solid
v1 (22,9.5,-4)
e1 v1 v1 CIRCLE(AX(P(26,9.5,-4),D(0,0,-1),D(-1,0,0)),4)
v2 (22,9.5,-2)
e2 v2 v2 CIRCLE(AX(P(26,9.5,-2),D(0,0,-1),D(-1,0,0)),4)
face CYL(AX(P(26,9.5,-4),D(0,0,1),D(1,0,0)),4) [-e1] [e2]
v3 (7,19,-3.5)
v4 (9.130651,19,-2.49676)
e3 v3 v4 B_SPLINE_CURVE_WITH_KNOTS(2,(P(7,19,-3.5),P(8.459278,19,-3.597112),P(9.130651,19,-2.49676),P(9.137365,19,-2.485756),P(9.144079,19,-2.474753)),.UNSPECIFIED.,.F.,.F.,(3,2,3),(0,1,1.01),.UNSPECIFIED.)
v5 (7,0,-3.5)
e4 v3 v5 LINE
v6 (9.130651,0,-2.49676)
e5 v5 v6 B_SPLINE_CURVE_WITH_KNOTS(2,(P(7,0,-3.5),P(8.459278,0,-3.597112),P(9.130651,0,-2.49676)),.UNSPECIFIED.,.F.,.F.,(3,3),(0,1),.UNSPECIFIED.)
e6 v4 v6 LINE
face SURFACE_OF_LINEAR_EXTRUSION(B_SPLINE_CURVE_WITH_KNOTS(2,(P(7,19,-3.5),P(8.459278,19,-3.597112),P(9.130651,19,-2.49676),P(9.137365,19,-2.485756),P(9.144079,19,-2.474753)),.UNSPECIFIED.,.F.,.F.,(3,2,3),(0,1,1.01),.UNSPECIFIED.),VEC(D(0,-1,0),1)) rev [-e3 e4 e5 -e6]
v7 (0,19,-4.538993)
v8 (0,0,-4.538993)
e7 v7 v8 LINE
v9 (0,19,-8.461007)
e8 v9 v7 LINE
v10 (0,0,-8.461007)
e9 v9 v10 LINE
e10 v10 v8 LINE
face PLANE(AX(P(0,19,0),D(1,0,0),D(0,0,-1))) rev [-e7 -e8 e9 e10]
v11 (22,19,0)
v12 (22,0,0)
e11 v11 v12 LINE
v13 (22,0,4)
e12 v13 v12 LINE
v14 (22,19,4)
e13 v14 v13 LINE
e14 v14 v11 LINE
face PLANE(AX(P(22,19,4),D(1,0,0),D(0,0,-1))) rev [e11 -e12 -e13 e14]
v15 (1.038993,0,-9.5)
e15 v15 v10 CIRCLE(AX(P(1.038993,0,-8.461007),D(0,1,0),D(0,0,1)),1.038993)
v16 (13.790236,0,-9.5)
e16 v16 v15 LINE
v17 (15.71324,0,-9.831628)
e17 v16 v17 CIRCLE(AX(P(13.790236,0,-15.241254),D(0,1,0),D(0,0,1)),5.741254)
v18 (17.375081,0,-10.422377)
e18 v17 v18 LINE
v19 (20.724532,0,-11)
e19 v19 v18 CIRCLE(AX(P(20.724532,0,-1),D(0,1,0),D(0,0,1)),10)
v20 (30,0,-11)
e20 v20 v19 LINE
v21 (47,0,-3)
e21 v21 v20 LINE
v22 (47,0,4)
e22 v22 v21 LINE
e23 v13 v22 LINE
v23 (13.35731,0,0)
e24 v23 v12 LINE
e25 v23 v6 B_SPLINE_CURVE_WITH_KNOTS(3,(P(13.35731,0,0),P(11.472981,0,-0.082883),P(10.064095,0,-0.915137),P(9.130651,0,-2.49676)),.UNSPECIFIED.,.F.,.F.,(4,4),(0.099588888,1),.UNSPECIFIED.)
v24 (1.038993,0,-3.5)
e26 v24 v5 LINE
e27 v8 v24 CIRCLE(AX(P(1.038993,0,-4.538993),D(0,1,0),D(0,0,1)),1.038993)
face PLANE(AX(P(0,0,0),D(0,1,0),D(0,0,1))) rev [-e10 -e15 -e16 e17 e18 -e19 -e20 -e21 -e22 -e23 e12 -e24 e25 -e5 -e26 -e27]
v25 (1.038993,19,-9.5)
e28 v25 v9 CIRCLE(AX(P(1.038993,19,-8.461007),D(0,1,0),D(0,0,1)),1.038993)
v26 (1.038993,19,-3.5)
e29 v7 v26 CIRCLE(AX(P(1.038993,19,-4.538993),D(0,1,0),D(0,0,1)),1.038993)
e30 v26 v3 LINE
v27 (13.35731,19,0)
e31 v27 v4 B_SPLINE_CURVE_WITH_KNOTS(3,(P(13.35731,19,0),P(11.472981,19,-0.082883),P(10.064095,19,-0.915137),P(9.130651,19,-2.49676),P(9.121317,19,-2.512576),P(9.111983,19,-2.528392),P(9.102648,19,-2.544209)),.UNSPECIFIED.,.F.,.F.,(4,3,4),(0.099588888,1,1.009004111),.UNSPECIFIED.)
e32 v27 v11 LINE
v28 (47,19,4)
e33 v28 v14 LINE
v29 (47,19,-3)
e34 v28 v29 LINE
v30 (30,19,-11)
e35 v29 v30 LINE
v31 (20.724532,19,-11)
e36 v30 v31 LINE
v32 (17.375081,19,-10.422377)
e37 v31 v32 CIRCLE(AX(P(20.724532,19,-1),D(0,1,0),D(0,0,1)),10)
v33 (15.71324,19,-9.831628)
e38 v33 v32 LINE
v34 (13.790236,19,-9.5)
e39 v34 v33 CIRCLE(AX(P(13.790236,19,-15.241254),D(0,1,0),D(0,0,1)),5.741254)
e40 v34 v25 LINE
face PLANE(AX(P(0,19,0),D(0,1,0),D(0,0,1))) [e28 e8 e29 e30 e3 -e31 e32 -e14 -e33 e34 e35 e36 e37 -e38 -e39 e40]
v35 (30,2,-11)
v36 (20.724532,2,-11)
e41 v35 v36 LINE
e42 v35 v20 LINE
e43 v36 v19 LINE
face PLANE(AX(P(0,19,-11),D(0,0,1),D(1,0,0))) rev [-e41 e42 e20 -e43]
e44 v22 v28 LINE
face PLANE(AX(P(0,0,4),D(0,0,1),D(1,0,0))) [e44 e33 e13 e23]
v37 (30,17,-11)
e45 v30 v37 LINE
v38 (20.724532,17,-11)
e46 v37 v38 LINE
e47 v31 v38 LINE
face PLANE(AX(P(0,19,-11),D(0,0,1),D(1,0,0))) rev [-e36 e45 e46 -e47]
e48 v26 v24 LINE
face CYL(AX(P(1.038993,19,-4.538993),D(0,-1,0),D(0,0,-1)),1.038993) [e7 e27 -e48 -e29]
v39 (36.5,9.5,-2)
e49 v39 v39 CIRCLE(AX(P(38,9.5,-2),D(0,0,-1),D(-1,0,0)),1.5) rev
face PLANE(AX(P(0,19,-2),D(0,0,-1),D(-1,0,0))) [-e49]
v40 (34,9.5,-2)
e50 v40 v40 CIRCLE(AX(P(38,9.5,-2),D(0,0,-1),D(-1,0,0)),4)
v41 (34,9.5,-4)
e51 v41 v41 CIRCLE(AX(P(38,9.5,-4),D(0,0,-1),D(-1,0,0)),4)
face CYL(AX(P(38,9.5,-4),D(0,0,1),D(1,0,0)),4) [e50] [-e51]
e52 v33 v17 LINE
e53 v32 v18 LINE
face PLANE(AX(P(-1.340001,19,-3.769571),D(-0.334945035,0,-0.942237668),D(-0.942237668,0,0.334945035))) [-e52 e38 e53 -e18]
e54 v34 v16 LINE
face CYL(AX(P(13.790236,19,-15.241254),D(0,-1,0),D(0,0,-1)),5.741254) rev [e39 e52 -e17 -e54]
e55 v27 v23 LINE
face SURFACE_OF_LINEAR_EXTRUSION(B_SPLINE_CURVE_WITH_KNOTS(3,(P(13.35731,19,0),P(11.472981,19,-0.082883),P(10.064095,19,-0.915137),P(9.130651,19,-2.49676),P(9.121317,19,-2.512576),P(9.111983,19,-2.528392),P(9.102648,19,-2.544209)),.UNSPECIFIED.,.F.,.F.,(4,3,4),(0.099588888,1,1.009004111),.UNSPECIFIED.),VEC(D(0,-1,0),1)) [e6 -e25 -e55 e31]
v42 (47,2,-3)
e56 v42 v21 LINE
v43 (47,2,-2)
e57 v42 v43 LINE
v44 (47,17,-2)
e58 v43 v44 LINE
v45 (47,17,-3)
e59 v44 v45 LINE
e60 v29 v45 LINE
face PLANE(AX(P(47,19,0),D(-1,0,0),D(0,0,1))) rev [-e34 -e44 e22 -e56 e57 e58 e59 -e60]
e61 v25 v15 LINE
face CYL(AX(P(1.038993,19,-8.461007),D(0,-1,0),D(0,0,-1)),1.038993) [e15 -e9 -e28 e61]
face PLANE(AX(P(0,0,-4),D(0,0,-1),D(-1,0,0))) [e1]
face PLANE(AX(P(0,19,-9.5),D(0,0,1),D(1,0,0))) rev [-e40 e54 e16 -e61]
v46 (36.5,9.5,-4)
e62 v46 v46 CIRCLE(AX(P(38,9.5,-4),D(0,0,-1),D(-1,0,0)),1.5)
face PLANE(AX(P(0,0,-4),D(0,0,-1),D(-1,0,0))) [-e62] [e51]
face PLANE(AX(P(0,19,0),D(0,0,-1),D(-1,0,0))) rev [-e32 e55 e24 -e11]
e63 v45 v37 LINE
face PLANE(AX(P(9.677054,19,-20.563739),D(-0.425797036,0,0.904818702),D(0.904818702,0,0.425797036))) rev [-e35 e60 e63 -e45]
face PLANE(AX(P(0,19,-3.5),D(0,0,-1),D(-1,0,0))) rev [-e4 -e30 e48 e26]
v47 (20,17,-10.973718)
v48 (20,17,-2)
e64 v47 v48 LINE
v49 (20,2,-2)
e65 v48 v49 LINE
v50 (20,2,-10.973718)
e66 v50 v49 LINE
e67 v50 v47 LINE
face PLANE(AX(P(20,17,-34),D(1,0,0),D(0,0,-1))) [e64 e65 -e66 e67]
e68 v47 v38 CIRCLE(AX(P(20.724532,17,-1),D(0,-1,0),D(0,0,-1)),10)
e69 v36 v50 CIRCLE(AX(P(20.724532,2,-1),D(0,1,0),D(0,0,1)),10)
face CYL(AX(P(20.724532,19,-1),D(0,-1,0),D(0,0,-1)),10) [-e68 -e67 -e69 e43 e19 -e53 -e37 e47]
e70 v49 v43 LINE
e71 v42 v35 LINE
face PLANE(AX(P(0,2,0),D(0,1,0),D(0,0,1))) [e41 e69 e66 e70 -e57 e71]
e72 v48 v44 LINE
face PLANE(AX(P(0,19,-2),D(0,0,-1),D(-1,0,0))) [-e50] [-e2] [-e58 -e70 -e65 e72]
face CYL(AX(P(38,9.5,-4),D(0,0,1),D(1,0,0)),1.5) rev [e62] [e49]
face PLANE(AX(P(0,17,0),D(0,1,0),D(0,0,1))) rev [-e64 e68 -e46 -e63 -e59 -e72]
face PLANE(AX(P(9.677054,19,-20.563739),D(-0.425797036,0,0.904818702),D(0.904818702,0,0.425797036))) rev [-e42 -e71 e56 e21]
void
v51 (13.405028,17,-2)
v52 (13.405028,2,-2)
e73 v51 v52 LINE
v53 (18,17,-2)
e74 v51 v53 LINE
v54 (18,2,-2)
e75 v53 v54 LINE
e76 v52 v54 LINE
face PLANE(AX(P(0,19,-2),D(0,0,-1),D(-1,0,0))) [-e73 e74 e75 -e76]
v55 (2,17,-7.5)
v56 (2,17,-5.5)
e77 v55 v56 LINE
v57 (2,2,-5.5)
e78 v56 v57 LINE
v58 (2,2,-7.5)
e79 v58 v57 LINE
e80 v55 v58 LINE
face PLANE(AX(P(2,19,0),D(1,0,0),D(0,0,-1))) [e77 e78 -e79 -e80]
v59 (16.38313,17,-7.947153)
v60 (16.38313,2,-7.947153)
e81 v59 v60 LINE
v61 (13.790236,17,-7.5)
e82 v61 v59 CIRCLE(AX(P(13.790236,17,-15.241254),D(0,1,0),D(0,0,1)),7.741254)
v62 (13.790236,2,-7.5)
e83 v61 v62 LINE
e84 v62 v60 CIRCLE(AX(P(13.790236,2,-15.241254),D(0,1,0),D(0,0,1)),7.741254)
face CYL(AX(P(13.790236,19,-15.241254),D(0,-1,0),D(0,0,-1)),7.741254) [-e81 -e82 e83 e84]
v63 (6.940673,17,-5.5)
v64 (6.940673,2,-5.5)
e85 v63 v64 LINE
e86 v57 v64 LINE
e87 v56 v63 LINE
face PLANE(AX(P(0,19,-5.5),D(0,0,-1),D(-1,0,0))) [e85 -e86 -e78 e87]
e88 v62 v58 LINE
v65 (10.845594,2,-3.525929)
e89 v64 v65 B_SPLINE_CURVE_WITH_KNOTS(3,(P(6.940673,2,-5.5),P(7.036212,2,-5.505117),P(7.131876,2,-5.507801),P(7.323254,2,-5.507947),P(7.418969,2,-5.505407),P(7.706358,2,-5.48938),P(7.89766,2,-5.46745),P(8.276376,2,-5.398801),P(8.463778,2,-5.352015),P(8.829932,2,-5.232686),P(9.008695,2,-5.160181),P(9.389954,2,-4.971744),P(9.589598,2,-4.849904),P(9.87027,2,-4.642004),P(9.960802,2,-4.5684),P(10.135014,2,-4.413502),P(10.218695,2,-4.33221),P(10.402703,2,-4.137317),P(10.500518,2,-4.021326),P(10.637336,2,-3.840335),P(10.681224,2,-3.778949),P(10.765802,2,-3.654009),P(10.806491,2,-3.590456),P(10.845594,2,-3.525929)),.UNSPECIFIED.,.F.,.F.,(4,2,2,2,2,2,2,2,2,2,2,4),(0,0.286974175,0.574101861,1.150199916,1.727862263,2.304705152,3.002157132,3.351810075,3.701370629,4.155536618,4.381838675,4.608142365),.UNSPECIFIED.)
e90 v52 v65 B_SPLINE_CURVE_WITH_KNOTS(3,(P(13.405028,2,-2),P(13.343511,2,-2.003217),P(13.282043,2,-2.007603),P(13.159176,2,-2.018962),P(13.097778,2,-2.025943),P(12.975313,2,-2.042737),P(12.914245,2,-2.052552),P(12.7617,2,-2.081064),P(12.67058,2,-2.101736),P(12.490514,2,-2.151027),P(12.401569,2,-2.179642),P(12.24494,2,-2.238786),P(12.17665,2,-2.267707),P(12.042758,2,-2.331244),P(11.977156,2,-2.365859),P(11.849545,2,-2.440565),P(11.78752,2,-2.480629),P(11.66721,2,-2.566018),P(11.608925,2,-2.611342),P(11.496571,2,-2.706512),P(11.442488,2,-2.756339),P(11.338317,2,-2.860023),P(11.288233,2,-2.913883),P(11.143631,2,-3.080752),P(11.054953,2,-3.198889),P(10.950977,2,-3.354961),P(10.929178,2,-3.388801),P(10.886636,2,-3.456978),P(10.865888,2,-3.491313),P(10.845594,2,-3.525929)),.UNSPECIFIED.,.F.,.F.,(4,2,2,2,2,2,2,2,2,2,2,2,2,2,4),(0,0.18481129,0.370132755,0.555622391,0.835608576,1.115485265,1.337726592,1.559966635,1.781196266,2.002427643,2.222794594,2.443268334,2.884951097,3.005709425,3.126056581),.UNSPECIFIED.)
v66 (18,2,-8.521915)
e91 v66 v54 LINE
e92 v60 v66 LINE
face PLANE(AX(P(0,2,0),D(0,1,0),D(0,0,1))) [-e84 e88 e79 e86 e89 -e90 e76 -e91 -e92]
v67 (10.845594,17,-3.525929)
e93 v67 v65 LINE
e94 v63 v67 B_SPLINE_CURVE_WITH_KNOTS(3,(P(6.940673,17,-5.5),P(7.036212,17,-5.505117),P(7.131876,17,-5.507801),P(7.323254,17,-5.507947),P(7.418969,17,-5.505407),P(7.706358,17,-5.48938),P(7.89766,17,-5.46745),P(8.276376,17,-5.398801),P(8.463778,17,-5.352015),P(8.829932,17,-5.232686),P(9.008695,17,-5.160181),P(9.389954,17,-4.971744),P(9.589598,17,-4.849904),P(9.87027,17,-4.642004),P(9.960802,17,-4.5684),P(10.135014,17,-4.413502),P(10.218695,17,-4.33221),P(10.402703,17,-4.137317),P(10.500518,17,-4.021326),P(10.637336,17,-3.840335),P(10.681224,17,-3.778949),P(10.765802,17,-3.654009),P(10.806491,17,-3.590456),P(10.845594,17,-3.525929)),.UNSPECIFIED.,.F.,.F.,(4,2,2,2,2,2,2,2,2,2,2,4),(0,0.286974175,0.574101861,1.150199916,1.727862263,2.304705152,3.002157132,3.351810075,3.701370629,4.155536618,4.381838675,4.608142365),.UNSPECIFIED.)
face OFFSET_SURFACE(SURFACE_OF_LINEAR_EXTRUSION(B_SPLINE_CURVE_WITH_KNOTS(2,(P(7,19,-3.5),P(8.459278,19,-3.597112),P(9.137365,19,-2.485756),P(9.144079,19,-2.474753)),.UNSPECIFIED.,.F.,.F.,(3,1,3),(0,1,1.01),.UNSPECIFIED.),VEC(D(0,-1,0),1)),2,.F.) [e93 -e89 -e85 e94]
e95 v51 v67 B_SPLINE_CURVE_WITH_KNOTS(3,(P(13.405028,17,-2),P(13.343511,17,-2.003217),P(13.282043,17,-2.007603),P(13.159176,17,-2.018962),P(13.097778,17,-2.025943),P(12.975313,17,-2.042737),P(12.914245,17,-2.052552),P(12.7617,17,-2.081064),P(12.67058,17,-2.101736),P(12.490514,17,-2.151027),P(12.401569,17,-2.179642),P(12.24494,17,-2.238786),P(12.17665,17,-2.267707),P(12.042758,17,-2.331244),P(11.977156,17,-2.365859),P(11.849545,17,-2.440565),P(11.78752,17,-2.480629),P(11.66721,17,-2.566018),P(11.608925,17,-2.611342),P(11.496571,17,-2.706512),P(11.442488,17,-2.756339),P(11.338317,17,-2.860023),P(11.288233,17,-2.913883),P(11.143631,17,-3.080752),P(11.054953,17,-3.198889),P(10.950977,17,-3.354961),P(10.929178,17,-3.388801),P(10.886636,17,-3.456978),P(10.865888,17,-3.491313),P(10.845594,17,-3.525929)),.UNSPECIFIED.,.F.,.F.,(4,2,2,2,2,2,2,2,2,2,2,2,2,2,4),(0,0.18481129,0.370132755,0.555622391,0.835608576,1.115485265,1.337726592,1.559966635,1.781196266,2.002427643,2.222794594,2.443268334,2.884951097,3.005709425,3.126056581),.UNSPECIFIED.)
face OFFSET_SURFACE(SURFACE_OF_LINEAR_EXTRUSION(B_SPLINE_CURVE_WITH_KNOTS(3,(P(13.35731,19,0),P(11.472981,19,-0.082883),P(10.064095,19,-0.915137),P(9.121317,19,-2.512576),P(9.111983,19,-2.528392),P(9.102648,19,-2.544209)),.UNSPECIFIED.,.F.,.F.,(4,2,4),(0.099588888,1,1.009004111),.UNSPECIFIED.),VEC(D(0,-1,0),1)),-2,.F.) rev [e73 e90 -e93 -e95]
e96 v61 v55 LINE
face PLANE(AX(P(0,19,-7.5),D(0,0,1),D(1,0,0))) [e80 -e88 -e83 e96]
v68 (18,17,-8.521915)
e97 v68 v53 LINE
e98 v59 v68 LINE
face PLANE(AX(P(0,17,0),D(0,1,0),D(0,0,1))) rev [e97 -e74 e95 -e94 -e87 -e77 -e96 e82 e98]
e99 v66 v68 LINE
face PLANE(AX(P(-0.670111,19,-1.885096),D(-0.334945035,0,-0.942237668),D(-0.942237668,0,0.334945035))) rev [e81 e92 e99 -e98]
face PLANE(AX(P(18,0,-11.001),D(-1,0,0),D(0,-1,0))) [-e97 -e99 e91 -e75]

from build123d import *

# Parameters (mm, degrees)
BOSS_EXTRUDE1_DEPTH = 19
SHELL1_START        = 2
SHELL1_DEPTH        = 15
SKETCH3_W           = 1.941176471
SKETCH3_H           = 15
CUT_EXTRUDE1_DEPTH  = 19
SKETCH4_W           = 27
SKETCH4_H           = 15
CUT_EXTRUDE2_DEPTH  = 32
BOSS_EXTRUDE2_REACH = 53.488
SKETCH5_W           = 2
SKETCH5_H           = 15
BOSS_EXTRUDE3_DEPTH = 2
SKETCH9_W           = 25
SKETCH9_H           = 19
BOSS_EXTRUDE4_DEPTH = 4


# Read off the part's stored shape, not the designer's step: Shell1
with BuildPart() as part:
    # Sketch1 → Boss-Extrude1 (new body)
    with BuildSketch(Plane(origin=(0, 0, 0), x_dir=(1, 0, 0), z_dir=(0, 1, 0))):
        with BuildLine():
            Line((1.038993018, 3.5), (7, 3.5))
            add(Edge.make_bspline(
                [(7, 3.5), (8.459278233, 3.59711175), (9.130651495, 2.496759959)],
                knots=[0, 0, 0, 1, 1, 1], degree=2))
            add(Edge.make_bspline(
                [(13.357309771, 0), (11.472981218, 0.082883183), (10.064095126, 0.915136502), (9.130651495, 2.496759959)],
                knots=[0.099588888, 0.099588888, 0.099588888, 0.099588888, 1, 1, 1, 1], degree=3))
            Line((13.357309771, 0), (47, 0))
            Line((47, 0), (47, 3))
            Line((47, 3), (30, 11))
            Line((30, 11), (20.724531658, 11))
            ThreePointArc((20.724531658, 11), (19.025085695, 10.854536185), (17.375081312, 10.422376684))
            Line((17.375081312, 10.422376684), (15.713240119, 9.83162822))
            ThreePointArc((15.713240119, 9.83162822), (14.765930685, 9.583514472), (13.790235586, 9.5))
            Line((13.790235586, 9.5), (1.038993018, 9.5))
            ThreePointArc((1.038993018, 9.5), (0.304314009, 9.195685991), (0, 8.461006982))
            Line((0, 8.461006982), (0, 4.538993018))
            ThreePointArc((0, 4.538993018), (0.304314009, 3.804314009), (1.038993018, 3.5))
        make_face()
    extrude(amount=BOSS_EXTRUDE1_DEPTH)

    # Shell1 outline → Shell1 (cut)
    with BuildSketch(Plane(origin=(0, 0, 0), x_dir=(1, 0, 0), z_dir=(0, 1, 0)).offset(SHELL1_START)):
        with BuildLine():
            Line((2, 5.5), (6.940673062, 5.500000119))
            add(Edge.make_bspline(
                [(6.940673062, 5.500000119), (7.109177951, 5.50902653), (7.278234995, 5.512602664), (7.447878181, 5.510422658), (7.618098093, 5.502157784), (7.78882908, 5.487449259), (7.959932498, 5.465914346), (8.131179576, 5.437162857), (8.302237446, 5.400821142), (8.47266191, 5.356560666), (8.641900457, 5.304128263), (8.809309112, 5.243375169), (8.974186651, 5.174281921), (9.219363913, 5.057026039), (9.302034833, 5.014883346), (9.383743481, 4.970562513), (9.464391034, 4.924089732), (9.543880108, 4.875502014), (9.622116004, 4.824846185), (9.699007976, 4.772177888), (9.774470476, 4.71756058), (9.848424417, 4.661064529), (9.920798428, 4.602765816), (9.991530106, 4.542745331), (10.060567276, 4.481087773), (10.161520229, 4.386277087), (10.194737041, 4.354285549), (10.227514411, 4.321917126), (10.25984764, 4.289182819), (10.291732596, 4.256093529), (10.323165718, 4.222660069), (10.354144009, 4.188893152), (10.384665044, 4.154803401), (10.414726966, 4.120401341), (10.444328485, 4.085697407), (10.47346888, 4.050701936), (10.502148, 4.015425173), (10.544475391, 3.962103314), (10.558469269, 3.944261494), (10.572347936, 3.926353044), (10.586111461, 3.908379178), (10.599759937, 3.890341094), (10.613293488, 3.872239973), (10.626712261, 3.854076975), (10.640016431, 3.835853244), (10.6532062, 3.817569903), (10.666281796, 3.799228059), (10.679243473, 3.7808288), (10.692091515, 3.762373195), (10.711193584, 3.734606845), (10.717532595, 3.725337582), (10.723843304, 3.716054631), (10.730125756, 3.706758115), (10.736379994, 3.697448159), (10.742606064, 3.688124887), (10.748804009, 3.678788423), (10.754973874, 3.669438891), (10.761115703, 3.660076416), (10.76722954, 3.650701121), (10.77331543, 3.641313131), (10.779373416, 3.63191257), (10.788418607, 3.617793057), (10.791426708, 3.613083439), (10.794427853, 3.608370721), (10.797422049, 3.603654918), (10.800409303, 3.598936043), (10.803389621, 3.594214111), (10.806363009, 3.589489136), (10.809329475, 3.584761133), (10.812289025, 3.580030115), (10.815241666, 3.575296097), (10.818187405, 3.570559093), (10.821126247, 3.565819118), (10.824791189, 3.559890452), (10.825523747, 3.558704534), (10.826255874, 3.557518432), (10.826987571, 3.556332144), (10.827718838, 3.555145673), (10.828449675, 3.553959018), (10.829180081, 3.552772178), (10.829910058, 3.551585155), (10.830639605, 3.550397949), (10.831368723, 3.54921056), (10.83209741, 3.548022987), (10.832825669, 3.546835232), (10.833735455, 3.54535031), (10.833917386, 3.545053315), (10.834099289, 3.544756307), (10.834281166, 3.544459289), (10.834463016, 3.544162259), (10.834644839, 3.543865217), (10.834826636, 3.543568164), (10.835008405, 3.5432711), (10.835190148, 3.542974025), (10.835371864, 3.542676938), (10.835553553, 3.542379839), (10.835735215, 3.54208273), (10.836007668, 3.541637048), (10.836098479, 3.541488485), (10.836189283, 3.541339918), (10.836280081, 3.541191349), (10.836370872, 3.541042777), (10.836461656, 3.540894203), (10.836552434, 3.540745625), (10.836643204, 3.540597045), (10.836733968, 3.540448461), (10.836824726, 3.540299875), (10.836915476, 3.540151286), (10.83700622, 3.540002694), (10.837142326, 3.539779803), (10.837187693, 3.539705504), (10.837233059, 3.539631206), (10.837278422, 3.539556906), (10.837323784, 3.539482606), (10.837369144, 3.539408305), (10.837414503, 3.539334004), (10.83745986, 3.539259701), (10.837505215, 3.539185398), (10.837550569, 3.539111095), (10.83759592, 3.53903679), (10.837641271, 3.538962485), (10.837697956, 3.538869603), (10.837709293, 3.538851026), (10.83772063, 3.53883245), (10.837731967, 3.538813873), (10.837743304, 3.538795297), (10.83775464, 3.53877672), (10.837765977, 3.538758143), (10.837777313, 3.538739566), (10.83778865, 3.53872099), (10.837799986, 3.538702413), (10.837811322, 3.538683836), (10.837822658, 3.538665259), (10.837839662, 3.538637393), (10.83784533, 3.538628105), (10.837850998, 3.538618816), (10.837856665, 3.538609528), (10.837862333, 3.538600239), (10.837868001, 3.538590951), (10.837873669, 3.538581662), (10.837879336, 3.538572374), (10.837885004, 3.538563085), (10.837890672, 3.538553797), (10.83789634, 3.538544508), (10.837902007, 3.538535219), (10.837913343, 3.538516642), (10.837916038, 3.538512225), (10.837946561, 3.538462199), (10.83784979, 3.538620803), (10.838122406, 3.538173997), (10.837653087, 3.53894319), (10.838244889, 3.537973253), (10.837760219, 3.538767605), (10.838033901, 3.538319054), (10.837937534, 3.538476994), (10.837963449, 3.53843452), (10.837964102, 3.538433451), (10.83798002, 3.538407361), (10.837992755, 3.53838649), (10.838005489, 3.538365619), (10.838018224, 3.538344747), (10.838030958, 3.538323876), (10.838043693, 3.538303005), (10.838056427, 3.538282134), (10.838069162, 3.538261262), (10.838081896, 3.538240391), (10.838094631, 3.53821952), (10.838107365, 3.538198648), (10.8381201, 3.538177777), (10.838336586, 3.537822965), (10.838540338, 3.537489024), (10.838744091, 3.537155083), (10.838947843, 3.536821142), (10.839151595, 3.536487201), (10.839355347, 3.53615326), (10.839559099, 3.535819319), (10.839762851, 3.535485379), (10.839966603, 3.535151438), (10.840170355, 3.534817497), (10.840374107, 3.534483556), (10.840577859, 3.534149615), (10.841151786, 3.533208975), (10.84152196, 3.532602276), (10.841892134, 3.531995576), (10.842262308, 3.531388877), (10.842632482, 3.530782178), (10.843002656, 3.530175479), (10.84337283, 3.529568779), (10.843743004, 3.52896208), (10.844113178, 3.528355381), (10.844483352, 3.527748682), (10.844853526, 3.527141983), (10.8452237, 3.526535283), (10.845593874, 3.525928584)],
                knots=[0.016399164, 0.016399164, 0.016399164, 0.016399164, 0.016399164, 0.016399164, 0.016399164, 0.016399164, 0.016399164, 0.016399164, 0.016399164, 0.016399164, 0.016399164, 0.016399164, 0.505, 0.505, 0.505, 0.505, 0.505, 0.505, 0.505, 0.505, 0.505, 0.505, 0.505, 0.505, 0.7575, 0.7575, 0.7575, 0.7575, 0.7575, 0.7575, 0.7575, 0.7575, 0.7575, 0.7575, 0.7575, 0.7575, 0.88375, 0.88375, 0.88375, 0.88375, 0.88375, 0.88375, 0.88375, 0.88375, 0.88375, 0.88375, 0.88375, 0.88375, 0.946875, 0.946875, 0.946875, 0.946875, 0.946875, 0.946875, 0.946875, 0.946875, 0.946875, 0.946875, 0.946875, 0.946875, 0.9784375, 0.9784375, 0.9784375, 0.9784375, 0.9784375, 0.9784375, 0.9784375, 0.9784375, 0.9784375, 0.9784375, 0.9784375, 0.9784375, 0.99421875, 0.99421875, 0.99421875, 0.99421875, 0.99421875, 0.99421875, 0.99421875, 0.99421875, 0.99421875, 0.99421875, 0.99421875, 0.99421875, 0.998164063, 0.998164063, 0.998164063, 0.998164063, 0.998164063, 0.998164063, 0.998164063, 0.998164063, 0.998164063, 0.998164063, 0.998164063, 0.998164063, 0.999150391, 0.999150391, 0.999150391, 0.999150391, 0.999150391, 0.999150391, 0.999150391, 0.999150391, 0.999150391, 0.999150391, 0.999150391, 0.999150391, 0.999643555, 0.999643555, 0.999643555, 0.999643555, 0.999643555, 0.999643555, 0.999643555, 0.999643555, 0.999643555, 0.999643555, 0.999643555, 0.999643555, 0.999890137, 0.999890137, 0.999890137, 0.999890137, 0.999890137, 0.999890137, 0.999890137, 0.999890137, 0.999890137, 0.999890137, 0.999890137, 0.999890137, 0.999951782, 0.999951782, 0.999951782, 0.999951782, 0.999951782, 0.999951782, 0.999951782, 0.999951782, 0.999951782, 0.999951782, 0.999951782, 0.999951782, 0.999982605, 0.999982605, 0.999982605, 0.999982605, 0.999982605, 0.999982605, 0.999982605, 0.999982605, 0.999982605, 0.999982605, 0.999982605, 0.999982605, 1.000013428, 1.000013428, 1.000013428, 1.000013428, 1.000013428, 1.000013428, 1.000013428, 1.000013428, 1.000013428, 1.000013428, 1.000013428, 1.000013428, 1.000136719, 1.000136719, 1.000136719, 1.000136719, 1.000136719, 1.000136719, 1.000136719, 1.000136719, 1.000136719, 1.000136719, 1.000136719, 1.000136719, 1.002109375, 1.002109375, 1.002109375, 1.002109375, 1.002109375, 1.002109375, 1.002109375, 1.002109375, 1.002109375, 1.002109375, 1.002109375, 1.002109375, 1.00569327, 1.00569327, 1.00569327, 1.00569327, 1.00569327, 1.00569327, 1.00569327, 1.00569327, 1.00569327, 1.00569327, 1.00569327, 1.00569327, 1.00569327, 1.00569327], degree=13))
            add(Edge.make_bspline(
                [(13.40502786, 2.000000011), (13.264344282, 2.007348761), (13.129461459, 2.018818573), (13.000298688, 2.034202634), (12.876741801, 2.053292288), (12.758634127, 2.075880248), (12.645770972, 2.101768123), (12.53789756, 2.130776865), (12.43471047, 2.162758716), (12.335862518, 2.197609267), (12.24097111, 2.235278213), (12.149630028, 2.2757774), (12.061424662, 2.319184765), (11.975950656, 2.365642759), (11.85043569, 2.440707527), (11.808649689, 2.466910979), (11.767427174, 2.493986159), (11.726719836, 2.521963241), (11.68648208, 2.550876142), (11.64667126, 2.580762055), (11.607247906, 2.611660969), (11.568175964, 2.643615195), (11.529423015, 2.676668893), (11.490960519, 2.710867597), (11.452764036, 2.746257739), (11.414813464, 2.782886175), (11.377093268, 2.820799712), (11.320842431, 2.879667092), (11.302146827, 2.899622258), (11.283504508, 2.919916022), (11.264914303, 2.940554181), (11.246375261, 2.961542442), (11.227886646, 2.982886421), (11.209447946, 3.004591639), (11.191058864, 3.026663528), (11.172719324, 3.049107427), (11.154429467, 3.071928583), (11.136189656, 3.095132152), (11.118000471, 3.118723197), (11.099862709, 3.14270669), (11.072734729, 3.179277921), (11.063705051, 3.191567735), (11.054688524, 3.203957503), (11.045685321, 3.216447775), (11.036695613, 3.2290391), (11.02771957, 3.241732028), (11.018757363, 3.25452711), (11.009809165, 3.267424893), (11.000875145, 3.280425929), (10.991955475, 3.293530767), (10.983050326, 3.306739957), (10.974159869, 3.320054049), (10.965284275, 3.333473592), (10.951993435, 3.353761908), (10.947566934, 3.360551162), (10.943144241, 3.367366957), (10.938725387, 3.374209352), (10.934310402, 3.381078406), (10.929899315, 3.387974178), (10.925492157, 3.394896728), (10.921088956, 3.401846114), (10.916689746, 3.408822396), (10.912294553, 3.415825632), (10.907903408, 3.422855882), (10.903516342, 3.429913206), (10.899133385, 3.436997661), (10.892565157, 3.44766513), (10.890376783, 3.45122775), (10.888189448, 3.454797173), (10.886003158, 3.458373406), (10.883817916, 3.461956456), (10.881633726, 3.46554633), (10.879450592, 3.469143034), (10.877268519, 3.472746575), (10.875087511, 3.47635696), (10.872907571, 3.479974196), (10.870728705, 3.483598289), (10.868550916, 3.487229246), (10.866374209, 3.490867075), (10.863654681, 3.495422958), (10.863110843, 3.496334564), (10.862567074, 3.4972466), (10.862023372, 3.498159067), (10.861479738, 3.499071963), (10.860936173, 3.49998529), (10.860392676, 3.500899047), (10.859849247, 3.501813235), (10.859305886, 3.502727853), (10.858762594, 3.503642901), (10.85821937, 3.504558381), (10.857676215, 3.505474291), (10.857133128, 3.506390633), (10.856454356, 3.507536598), (10.856318605, 3.507765818), (10.856182859, 3.507995065), (10.856047118, 3.508224339), (10.85591138, 3.50845364), (10.855775648, 3.508682968), (10.855639918, 3.508912322), (10.855504195, 3.509141704), (10.855368474, 3.509371113), (10.855232759, 3.509600548), (10.855097047, 3.509830011), (10.85496134, 3.510059501), (10.854825637, 3.510289017), (10.854622089, 3.510633332), (10.854554241, 3.510748111), (10.854486393, 3.510862896), (10.854418547, 3.510977688), (10.854350702, 3.511092487), (10.854282858, 3.511207292), (10.854215016, 3.511322104), (10.854147174, 3.511436923), (10.854079333, 3.511551749), (10.854011494, 3.511666581), (10.853943655, 3.51178142), (10.853875818, 3.511896266), (10.853807981, 3.512011119), (10.853706228, 3.512183408), (10.853672311, 3.512240839), (10.853638394, 3.512298272), (10.853604477, 3.512355707), (10.85357056, 3.512413143), (10.853536644, 3.512470581), (10.853502728, 3.512528021), (10.853468812, 3.512585463), (10.853434897, 3.512642906), (10.853400982, 3.512700351), (10.853367066, 3.512757797), (10.853333152, 3.512815245), (10.853299237, 3.512872695), (10.853256845, 3.51294451), (10.853248366, 3.512958873), (10.853239888, 3.512973236), (10.853231409, 3.512987599), (10.853222931, 3.513001962), (10.853214452, 3.513016326), (10.853205974, 3.513030689), (10.853197496, 3.513045053), (10.853189017, 3.513059417), (10.853180539, 3.513073781), (10.85317206, 3.513088145), (10.853163582, 3.513102509), (10.853155104, 3.513116873), (10.853138147, 3.513145601), (10.85312929, 3.513160607), (10.853122642, 3.51317187), (10.853113824, 3.513186812), (10.853080604, 3.513243094), (10.853183622, 3.513068551), (10.852898834, 3.513551077), (10.85334732, 3.512791183), (10.852811074, 3.513699781), (10.853221217, 3.513004843), (10.853004235, 3.513372494), (10.853047842, 3.513298607), (10.853028513, 3.513331359), (10.852991521, 3.513394037), (10.85296686, 3.513435823), (10.852942199, 3.513477609), (10.852917538, 3.513519394), (10.852892877, 3.51356118), (10.852868216, 3.513602966), (10.852843554, 3.513644752), (10.852818894, 3.513686537), (10.852794232, 3.513728323), (10.852769571, 3.513770109), (10.85274491, 3.513811894), (10.852720249, 3.51385368), (10.852695588, 3.513895466), (10.852276349, 3.514605823), (10.851881771, 3.515274394), (10.851487193, 3.515942965), (10.851092615, 3.516611537), (10.850698037, 3.517280108), (10.85030346, 3.517948679), (10.849908881, 3.518617251), (10.849514304, 3.519285822), (10.849119726, 3.519954393), (10.848725148, 3.520622965), (10.84833057, 3.521291536), (10.847935992, 3.521960107), (10.847541414, 3.522628678), (10.847035911, 3.523485202), (10.846924985, 3.523673155), (10.846814059, 3.523861107), (10.846703133, 3.52404906), (10.846592207, 3.524237012), (10.846481281, 3.524424964), (10.846370355, 3.524612917), (10.846259429, 3.524800869), (10.846148503, 3.524988822), (10.846037577, 3.525176774), (10.845926651, 3.525364727), (10.845815726, 3.525552679), (10.8457048, 3.525740632), (10.845593874, 3.525928584)],
                knots=[0.108628768, 0.108628768, 0.108628768, 0.108628768, 0.108628768, 0.108628768, 0.108628768, 0.108628768, 0.108628768, 0.108628768, 0.108628768, 0.108628768, 0.108628768, 0.108628768, 0.108628768, 0.5542965, 0.5542965, 0.5542965, 0.5542965, 0.5542965, 0.5542965, 0.5542965, 0.5542965, 0.5542965, 0.5542965, 0.5542965, 0.5542965, 0.5542965, 0.781650305, 0.781650305, 0.781650305, 0.781650305, 0.781650305, 0.781650305, 0.781650305, 0.781650305, 0.781650305, 0.781650305, 0.781650305, 0.781650305, 0.781650305, 0.895327208, 0.895327208, 0.895327208, 0.895327208, 0.895327208, 0.895327208, 0.895327208, 0.895327208, 0.895327208, 0.895327208, 0.895327208, 0.895327208, 0.895327208, 0.95216566, 0.95216566, 0.95216566, 0.95216566, 0.95216566, 0.95216566, 0.95216566, 0.95216566, 0.95216566, 0.95216566, 0.95216566, 0.95216566, 0.95216566, 0.980584885, 0.980584885, 0.980584885, 0.980584885, 0.980584885, 0.980584885, 0.980584885, 0.980584885, 0.980584885, 0.980584885, 0.980584885, 0.980584885, 0.980584885, 0.994794498, 0.994794498, 0.994794498, 0.994794498, 0.994794498, 0.994794498, 0.994794498, 0.994794498, 0.994794498, 0.994794498, 0.994794498, 0.994794498, 0.994794498, 0.998346901, 0.998346901, 0.998346901, 0.998346901, 0.998346901, 0.998346901, 0.998346901, 0.998346901, 0.998346901, 0.998346901, 0.998346901, 0.998346901, 0.998346901, 0.999235002, 0.999235002, 0.999235002, 0.999235002, 0.999235002, 0.999235002, 0.999235002, 0.999235002, 0.999235002, 0.999235002, 0.999235002, 0.999235002, 0.999235002, 0.999679053, 0.999679053, 0.999679053, 0.999679053, 0.999679053, 0.999679053, 0.999679053, 0.999679053, 0.999679053, 0.999679053, 0.999679053, 0.999679053, 0.999679053, 0.999901078, 0.999901078, 0.999901078, 0.999901078, 0.999901078, 0.999901078, 0.999901078, 0.999901078, 0.999901078, 0.999901078, 0.999901078, 0.999901078, 0.999901078, 0.999956584, 0.999956584, 0.999956584, 0.999956584, 0.999956584, 0.999956584, 0.999956584, 0.999956584, 0.999956584, 0.999956584, 0.999956584, 0.999956584, 0.999956584, 1.00001209, 1.00001209, 1.00001209, 1.00001209, 1.00001209, 1.00001209, 1.00001209, 1.00001209, 1.00001209, 1.00001209, 1.00001209, 1.00001209, 1.00001209, 1.000123103, 1.000123103, 1.000123103, 1.000123103, 1.000123103, 1.000123103, 1.000123103, 1.000123103, 1.000123103, 1.000123103, 1.000123103, 1.000123103, 1.000123103, 1.001899305, 1.001899305, 1.001899305, 1.001899305, 1.001899305, 1.001899305, 1.001899305, 1.001899305, 1.001899305, 1.001899305, 1.001899305, 1.001899305, 1.001899305, 1.00239864, 1.00239864, 1.00239864, 1.00239864, 1.00239864, 1.00239864, 1.00239864, 1.00239864, 1.00239864, 1.00239864, 1.00239864, 1.00239864, 1.00239864, 1.00239864, 1.00239864], degree=14))
            Line((13.40502786, 2.000000011), (45, 2))
            Line((45, 2), (45, 3.941176471))
            Line((45, 3.941176471), (30, 11))
            Line((30, 11), (20.724531658, 11))
            Line((20.724531658, 11), (20.724531658, 9))
            ThreePointArc((20.724531658, 9), (19.364974888, 8.883628948), (18.044971381, 8.537901347))
            Line((18.044971381, 8.537901347), (16.383130188, 7.947152883))
            ThreePointArc((16.383130188, 7.947152883), (15.105819878, 7.612607235), (13.790235586, 7.5))
            Line((13.790235586, 7.5), (2, 7.5))
            Line((2, 7.5), (2, 5.5))
        make_face()
    extrude(amount=SHELL1_DEPTH, mode=Mode.SUBTRACT)

    # Sketch3 → Cut-Extrude1 (cut)
    with BuildSketch(Plane.ZY.offset(-45)):
        with Locations((-2.970588236, 9.5)):
            Rectangle(SKETCH3_W, SKETCH3_H)
    extrude(amount=-CUT_EXTRUDE1_DEPTH, mode=Mode.SUBTRACT)

    # Sketch4 → Cut-Extrude2 (cut)
    with BuildSketch(Plane(origin=(0, 0, -2), x_dir=(-1, 0, 0), z_dir=(0, 0, -1))):
        with Locations((-33.5, 9.5)):
            Rectangle(SKETCH4_W, SKETCH4_H)
    extrude(amount=CUT_EXTRUDE2_DEPTH, mode=Mode.SUBTRACT)

    # Boss-Extrude2: up to this plane
    boss_extrude2_end = Plane(origin=(-0.670110696, 19, -1.885095984), z_dir=(-0.33494503463592523, 0, -0.9422376684110751))
    # Sketch5 → Boss-Extrude2 (add, up to the surface)
    with BuildSketch(Plane(origin=(0, 0, -2), x_dir=(-1, 0, 0), z_dir=(0, 0, -1)), mode=Mode.PRIVATE) as boss_extrude2_sk1:
        with Locations((-19, 9.5)):
            Rectangle(SKETCH5_W, SKETCH5_H)
    boss_extrude2_tool1 = split(extrude(boss_extrude2_sk1.sketch, amount=BOSS_EXTRUDE2_REACH, mode=Mode.PRIVATE), bisect_by=boss_extrude2_end, keep=Keep.BOTH, mode=Mode.PRIVATE)
    add(boss_extrude2_tool1.solids().sort_by_distance((19, 9.5, -2))[0])

    # Sketch8 → Boss-Extrude3 (add)
    with BuildSketch(Plane(origin=(0, 0, -2), x_dir=(-1, 0, 0), z_dir=(0, 0, -1))):
        with BuildLine():
            ThreePointArc((-34, 9.5), (-38, 13.5), (-42, 9.5))
            Line((-42, 9.5), (-39.5, 9.5))
            ThreePointArc((-39.5, 9.5), (-38, 11), (-36.5, 9.5))
            Line((-36.5, 9.5), (-34, 9.5))
        make_face()
        with BuildLine():
            Line((-39.5, 9.5), (-42, 9.5))
            ThreePointArc((-42, 9.5), (-38, 5.5), (-34, 9.5))
            Line((-34, 9.5), (-36.5, 9.5))
            ThreePointArc((-36.5, 9.5), (-38, 8), (-39.5, 9.5))
        make_face()
        with BuildLine():
            ThreePointArc((-22, 9.5), (-26, 13.5), (-30, 9.5))
            Line((-30, 9.5), (-22, 9.5))
        make_face()
        with BuildLine():
            Line((-22, 9.5), (-30, 9.5))
            ThreePointArc((-30, 9.5), (-26, 5.5), (-22, 9.5))
        make_face()
    extrude(amount=BOSS_EXTRUDE3_DEPTH)

    # Sketch9 → Boss-Extrude4 (add)
    with BuildSketch(Plane.XY):
        with Locations((34.5, 9.5)):
            Rectangle(SKETCH9_W, SKETCH9_H)
    extrude(amount=BOSS_EXTRUDE4_DEPTH)


solid = part.part
